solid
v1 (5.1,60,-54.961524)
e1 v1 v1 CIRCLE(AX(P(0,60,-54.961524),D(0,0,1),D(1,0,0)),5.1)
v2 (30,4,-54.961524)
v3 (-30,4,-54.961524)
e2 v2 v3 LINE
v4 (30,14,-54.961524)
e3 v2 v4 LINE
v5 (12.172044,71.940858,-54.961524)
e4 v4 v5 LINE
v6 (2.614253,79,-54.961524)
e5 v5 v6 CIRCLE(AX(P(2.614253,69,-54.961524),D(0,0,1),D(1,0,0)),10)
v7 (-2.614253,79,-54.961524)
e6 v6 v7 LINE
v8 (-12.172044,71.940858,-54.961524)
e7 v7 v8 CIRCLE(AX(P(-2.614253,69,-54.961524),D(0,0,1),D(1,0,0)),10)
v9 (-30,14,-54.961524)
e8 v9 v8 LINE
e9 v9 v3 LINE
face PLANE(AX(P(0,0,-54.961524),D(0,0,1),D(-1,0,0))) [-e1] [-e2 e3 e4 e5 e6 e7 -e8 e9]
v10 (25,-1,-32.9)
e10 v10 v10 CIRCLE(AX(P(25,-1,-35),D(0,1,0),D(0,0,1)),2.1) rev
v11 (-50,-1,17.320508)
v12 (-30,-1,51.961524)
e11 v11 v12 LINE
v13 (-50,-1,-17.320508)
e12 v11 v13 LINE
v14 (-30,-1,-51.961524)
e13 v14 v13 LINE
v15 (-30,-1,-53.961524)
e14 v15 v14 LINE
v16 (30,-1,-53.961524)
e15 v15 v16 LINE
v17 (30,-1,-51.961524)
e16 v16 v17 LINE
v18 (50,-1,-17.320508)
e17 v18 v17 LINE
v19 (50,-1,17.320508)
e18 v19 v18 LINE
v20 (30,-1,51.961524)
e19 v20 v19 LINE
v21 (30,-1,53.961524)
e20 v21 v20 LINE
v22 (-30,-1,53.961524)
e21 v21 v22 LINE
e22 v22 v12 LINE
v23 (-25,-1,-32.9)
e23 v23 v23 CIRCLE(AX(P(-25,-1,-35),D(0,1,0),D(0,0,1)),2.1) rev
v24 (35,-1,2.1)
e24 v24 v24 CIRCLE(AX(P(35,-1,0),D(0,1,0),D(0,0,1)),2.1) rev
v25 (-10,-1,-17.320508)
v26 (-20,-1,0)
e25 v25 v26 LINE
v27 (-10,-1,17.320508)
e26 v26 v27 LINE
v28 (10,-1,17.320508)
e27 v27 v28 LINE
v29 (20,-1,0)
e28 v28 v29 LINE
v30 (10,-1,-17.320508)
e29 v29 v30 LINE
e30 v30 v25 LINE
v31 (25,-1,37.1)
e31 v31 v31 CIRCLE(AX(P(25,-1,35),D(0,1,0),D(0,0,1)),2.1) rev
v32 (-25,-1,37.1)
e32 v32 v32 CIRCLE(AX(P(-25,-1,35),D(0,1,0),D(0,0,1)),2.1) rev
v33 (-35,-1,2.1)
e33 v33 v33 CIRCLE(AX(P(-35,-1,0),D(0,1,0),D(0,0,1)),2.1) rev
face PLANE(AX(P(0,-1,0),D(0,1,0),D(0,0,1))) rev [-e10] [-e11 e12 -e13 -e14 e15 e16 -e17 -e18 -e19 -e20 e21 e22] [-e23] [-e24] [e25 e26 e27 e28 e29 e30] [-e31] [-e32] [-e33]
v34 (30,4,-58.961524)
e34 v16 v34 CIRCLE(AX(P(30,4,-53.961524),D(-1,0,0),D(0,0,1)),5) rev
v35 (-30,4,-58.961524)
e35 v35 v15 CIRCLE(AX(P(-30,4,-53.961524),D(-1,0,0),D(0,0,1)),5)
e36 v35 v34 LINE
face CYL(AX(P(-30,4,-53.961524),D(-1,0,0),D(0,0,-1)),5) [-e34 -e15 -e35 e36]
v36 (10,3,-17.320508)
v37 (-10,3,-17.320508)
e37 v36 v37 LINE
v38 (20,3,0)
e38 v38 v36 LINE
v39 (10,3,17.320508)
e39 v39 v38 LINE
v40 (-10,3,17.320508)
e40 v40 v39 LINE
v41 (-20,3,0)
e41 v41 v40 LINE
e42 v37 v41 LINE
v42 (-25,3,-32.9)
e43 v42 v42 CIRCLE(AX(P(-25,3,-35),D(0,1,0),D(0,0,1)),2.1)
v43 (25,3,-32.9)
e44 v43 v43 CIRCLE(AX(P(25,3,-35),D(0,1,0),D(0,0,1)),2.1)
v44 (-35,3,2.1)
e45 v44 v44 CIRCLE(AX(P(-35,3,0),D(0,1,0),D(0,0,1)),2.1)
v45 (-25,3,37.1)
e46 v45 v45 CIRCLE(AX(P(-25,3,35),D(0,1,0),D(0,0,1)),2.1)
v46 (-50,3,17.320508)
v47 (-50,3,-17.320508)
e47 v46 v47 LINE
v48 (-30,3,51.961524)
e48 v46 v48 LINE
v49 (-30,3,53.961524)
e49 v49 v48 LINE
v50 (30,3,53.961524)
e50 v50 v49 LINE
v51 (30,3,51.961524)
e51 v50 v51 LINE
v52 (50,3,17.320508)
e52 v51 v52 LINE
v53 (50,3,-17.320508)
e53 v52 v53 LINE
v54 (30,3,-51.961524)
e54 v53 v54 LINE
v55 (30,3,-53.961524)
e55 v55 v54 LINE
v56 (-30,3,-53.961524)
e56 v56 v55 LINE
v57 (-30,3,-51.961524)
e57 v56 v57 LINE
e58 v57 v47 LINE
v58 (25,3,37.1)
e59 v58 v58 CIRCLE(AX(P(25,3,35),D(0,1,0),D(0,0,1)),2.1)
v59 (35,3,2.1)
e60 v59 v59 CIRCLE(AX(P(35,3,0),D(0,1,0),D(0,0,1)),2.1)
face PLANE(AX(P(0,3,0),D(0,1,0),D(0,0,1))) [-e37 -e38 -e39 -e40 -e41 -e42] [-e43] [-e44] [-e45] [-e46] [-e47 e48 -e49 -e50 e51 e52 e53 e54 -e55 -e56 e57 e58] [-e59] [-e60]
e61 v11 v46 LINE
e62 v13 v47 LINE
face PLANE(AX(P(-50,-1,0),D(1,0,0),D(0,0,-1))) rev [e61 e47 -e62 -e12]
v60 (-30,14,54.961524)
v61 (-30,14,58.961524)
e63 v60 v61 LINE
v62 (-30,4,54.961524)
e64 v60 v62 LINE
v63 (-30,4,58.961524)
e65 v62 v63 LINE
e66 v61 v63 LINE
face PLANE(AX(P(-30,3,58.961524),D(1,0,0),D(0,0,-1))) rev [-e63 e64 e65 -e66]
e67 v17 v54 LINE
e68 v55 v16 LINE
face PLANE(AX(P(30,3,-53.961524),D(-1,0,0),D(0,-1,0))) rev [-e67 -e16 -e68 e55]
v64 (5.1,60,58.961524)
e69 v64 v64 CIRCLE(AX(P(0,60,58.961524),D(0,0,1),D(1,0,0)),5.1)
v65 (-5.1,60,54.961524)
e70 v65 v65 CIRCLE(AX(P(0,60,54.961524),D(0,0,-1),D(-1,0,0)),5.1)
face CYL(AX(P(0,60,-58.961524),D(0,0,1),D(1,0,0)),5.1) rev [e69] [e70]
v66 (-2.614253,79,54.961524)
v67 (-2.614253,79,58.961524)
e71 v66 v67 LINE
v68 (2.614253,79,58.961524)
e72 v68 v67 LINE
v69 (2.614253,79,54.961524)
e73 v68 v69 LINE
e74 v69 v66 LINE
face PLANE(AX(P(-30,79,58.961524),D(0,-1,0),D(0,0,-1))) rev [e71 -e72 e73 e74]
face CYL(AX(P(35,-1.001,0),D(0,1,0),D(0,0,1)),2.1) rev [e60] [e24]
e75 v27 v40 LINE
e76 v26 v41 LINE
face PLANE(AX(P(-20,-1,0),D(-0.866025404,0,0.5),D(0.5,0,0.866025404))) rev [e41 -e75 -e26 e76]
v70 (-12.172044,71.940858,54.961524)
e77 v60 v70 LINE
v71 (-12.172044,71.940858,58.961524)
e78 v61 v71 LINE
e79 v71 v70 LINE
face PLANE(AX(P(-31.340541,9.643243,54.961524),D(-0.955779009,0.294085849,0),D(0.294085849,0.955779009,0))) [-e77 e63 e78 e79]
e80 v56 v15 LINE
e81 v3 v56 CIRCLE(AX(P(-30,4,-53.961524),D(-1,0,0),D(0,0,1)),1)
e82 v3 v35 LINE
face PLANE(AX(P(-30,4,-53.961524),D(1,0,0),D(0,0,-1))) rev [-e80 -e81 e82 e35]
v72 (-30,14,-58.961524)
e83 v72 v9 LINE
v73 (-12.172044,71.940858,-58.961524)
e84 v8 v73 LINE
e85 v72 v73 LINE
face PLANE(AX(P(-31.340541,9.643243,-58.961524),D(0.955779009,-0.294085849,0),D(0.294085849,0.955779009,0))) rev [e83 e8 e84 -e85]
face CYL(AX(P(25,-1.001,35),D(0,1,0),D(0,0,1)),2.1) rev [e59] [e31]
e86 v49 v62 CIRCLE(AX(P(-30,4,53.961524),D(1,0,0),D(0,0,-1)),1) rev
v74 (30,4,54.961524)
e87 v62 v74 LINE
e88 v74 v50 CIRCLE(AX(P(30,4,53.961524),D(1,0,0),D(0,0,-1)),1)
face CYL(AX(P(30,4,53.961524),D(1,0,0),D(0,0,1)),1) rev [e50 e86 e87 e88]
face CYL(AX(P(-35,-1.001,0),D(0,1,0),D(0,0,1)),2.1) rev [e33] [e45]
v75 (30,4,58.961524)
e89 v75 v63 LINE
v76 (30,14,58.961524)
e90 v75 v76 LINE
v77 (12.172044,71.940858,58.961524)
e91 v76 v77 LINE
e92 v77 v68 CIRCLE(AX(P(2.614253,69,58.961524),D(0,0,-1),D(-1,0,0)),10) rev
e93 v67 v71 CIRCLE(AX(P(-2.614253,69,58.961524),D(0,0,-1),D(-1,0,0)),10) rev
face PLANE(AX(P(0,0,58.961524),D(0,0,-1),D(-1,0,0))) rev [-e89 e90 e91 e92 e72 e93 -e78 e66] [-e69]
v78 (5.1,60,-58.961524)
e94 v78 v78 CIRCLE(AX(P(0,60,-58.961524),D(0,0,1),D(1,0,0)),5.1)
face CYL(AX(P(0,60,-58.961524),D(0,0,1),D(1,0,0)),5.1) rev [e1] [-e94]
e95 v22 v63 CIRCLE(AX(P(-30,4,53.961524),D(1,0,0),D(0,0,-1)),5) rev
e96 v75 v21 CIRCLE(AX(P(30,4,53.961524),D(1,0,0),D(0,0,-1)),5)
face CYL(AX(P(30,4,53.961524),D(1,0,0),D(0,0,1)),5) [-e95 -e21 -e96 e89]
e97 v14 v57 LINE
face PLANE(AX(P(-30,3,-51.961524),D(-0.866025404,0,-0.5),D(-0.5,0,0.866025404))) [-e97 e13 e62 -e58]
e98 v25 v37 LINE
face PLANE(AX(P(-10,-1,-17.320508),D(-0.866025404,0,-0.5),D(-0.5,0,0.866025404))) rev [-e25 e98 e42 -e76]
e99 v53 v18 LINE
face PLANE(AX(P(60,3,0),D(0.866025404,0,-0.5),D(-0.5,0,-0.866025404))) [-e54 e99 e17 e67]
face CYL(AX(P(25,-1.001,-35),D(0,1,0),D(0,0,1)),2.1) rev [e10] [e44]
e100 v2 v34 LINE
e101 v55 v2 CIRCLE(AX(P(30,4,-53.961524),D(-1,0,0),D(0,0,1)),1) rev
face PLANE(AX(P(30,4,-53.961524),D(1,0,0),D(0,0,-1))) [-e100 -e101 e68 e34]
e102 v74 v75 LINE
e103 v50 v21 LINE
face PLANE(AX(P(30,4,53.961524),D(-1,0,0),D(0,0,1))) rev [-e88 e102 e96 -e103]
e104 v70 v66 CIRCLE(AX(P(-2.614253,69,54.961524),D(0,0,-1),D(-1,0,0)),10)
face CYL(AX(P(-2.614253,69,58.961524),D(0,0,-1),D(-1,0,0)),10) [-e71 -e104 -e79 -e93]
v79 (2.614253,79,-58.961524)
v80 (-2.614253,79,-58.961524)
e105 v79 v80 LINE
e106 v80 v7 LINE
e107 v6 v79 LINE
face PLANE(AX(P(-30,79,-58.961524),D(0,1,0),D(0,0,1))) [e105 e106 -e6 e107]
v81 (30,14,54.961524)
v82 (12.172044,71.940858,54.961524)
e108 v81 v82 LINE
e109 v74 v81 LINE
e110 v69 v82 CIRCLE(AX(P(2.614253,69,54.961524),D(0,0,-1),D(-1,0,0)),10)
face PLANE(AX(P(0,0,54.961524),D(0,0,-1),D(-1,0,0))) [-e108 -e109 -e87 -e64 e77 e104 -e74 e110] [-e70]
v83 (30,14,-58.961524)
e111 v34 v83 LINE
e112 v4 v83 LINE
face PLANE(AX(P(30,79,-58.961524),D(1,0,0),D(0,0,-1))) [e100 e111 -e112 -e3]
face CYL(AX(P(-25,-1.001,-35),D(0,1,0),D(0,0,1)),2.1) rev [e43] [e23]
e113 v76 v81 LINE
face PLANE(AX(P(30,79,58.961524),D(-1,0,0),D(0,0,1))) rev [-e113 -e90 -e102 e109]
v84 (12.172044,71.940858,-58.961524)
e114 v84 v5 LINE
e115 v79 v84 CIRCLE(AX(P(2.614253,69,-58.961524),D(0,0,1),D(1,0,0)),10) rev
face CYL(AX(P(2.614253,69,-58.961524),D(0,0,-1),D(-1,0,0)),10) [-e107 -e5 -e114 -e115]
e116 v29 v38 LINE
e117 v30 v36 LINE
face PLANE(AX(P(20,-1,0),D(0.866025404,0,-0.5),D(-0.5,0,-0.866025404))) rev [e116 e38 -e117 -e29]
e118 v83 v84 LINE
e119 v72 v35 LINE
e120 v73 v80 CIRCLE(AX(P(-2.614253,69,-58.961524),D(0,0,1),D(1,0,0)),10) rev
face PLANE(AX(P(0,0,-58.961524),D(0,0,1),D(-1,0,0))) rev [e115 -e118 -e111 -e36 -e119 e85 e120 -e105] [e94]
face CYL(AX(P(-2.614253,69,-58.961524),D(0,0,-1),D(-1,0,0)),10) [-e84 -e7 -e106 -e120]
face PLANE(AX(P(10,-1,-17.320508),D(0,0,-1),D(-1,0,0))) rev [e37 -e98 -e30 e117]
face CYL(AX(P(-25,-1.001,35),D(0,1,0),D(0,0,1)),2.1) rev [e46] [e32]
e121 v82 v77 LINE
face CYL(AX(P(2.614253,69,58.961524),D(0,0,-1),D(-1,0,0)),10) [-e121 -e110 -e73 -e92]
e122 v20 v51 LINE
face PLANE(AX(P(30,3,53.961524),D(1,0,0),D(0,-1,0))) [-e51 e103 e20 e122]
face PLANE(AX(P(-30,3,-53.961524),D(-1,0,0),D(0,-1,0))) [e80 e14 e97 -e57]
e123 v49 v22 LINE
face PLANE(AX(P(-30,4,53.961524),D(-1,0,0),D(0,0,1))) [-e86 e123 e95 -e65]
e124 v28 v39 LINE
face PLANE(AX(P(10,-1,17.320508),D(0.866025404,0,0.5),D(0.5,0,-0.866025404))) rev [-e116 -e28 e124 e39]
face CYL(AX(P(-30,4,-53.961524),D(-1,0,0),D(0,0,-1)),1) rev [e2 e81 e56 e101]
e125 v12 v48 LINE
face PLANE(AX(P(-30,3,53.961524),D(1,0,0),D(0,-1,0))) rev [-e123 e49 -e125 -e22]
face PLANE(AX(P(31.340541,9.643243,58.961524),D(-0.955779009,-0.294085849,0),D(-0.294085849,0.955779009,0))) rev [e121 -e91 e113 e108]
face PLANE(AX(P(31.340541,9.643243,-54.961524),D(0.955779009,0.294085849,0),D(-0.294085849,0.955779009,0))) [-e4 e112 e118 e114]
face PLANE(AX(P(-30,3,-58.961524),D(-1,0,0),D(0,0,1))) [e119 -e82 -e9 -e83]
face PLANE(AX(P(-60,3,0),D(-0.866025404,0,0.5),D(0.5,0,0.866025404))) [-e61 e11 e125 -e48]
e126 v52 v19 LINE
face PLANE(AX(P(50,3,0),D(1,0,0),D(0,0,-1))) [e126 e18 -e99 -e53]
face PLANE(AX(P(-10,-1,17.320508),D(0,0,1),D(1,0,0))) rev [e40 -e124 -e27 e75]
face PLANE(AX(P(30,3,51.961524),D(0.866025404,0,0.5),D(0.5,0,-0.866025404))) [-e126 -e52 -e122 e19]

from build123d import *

# Parameters (mm, degrees)
EXTRUDE_1_DEPTH        = 3
SHEET_START            = -1
SHEET_METAL_1_DEPTH    = 1
SM_EDGE_FLANGE_1_DEPTH = 60
CUT_EXTRUDE_1_DEPTH    = 149.811702088
CUT_EXTRUDE_2_DEPTH    = 114.368696469
CUT_EXTRUDE_4_DEPTH    = 114.368696469
MIRROR_6_COPY_1_DEPTH  = 149.811702088
SKETCH_13_R            = 5.1
CUT_EXTRUDE_5_DEPTH    = 155.10011472
FILLET_1_R             = 10
CUT_EXTRUDE_6_REACH    = 110.409
SKETCH_15_R            = 2.1


# Read off the part's stored shape, not the designer's step: 轉換-實體1
# Sheet-metal steps are written as plain solids
with BuildPart() as part:
    # Sketch 1 → 填料-伸長1 (new body)
    with BuildSketch(Plane(origin=(0, 0, 0), x_dir=(1, 0, 0), z_dir=(0, 1, 0))):
        Polygon((30, 51.961524227), (-30, 51.961524227), (-60, 0), (-30, -51.961524227), (30, -51.961524227), (60, 0), align=None)
    extrude(amount=EXTRUDE_1_DEPTH)

    # Sheet Metal 1 outline → Sheet Metal 1 (add)
    with BuildSketch(Plane(origin=(0, 0, 0), x_dir=(1, 0, 0), z_dir=(0, 1, 0)).offset(SHEET_START)):
        Polygon((-30, 51.961524227), (-60, 0), (-30, -51.961524227), (30, -51.961524227), (60, 0), (30, 51.961524227), align=None)
    extrude(amount=SHEET_METAL_1_DEPTH)

    # 邊線-凸緣1 section (across the edge) → 邊線-凸緣1 (add)
    with BuildSketch(Plane(origin=(-30, 3, 54.961524227), x_dir=(0, 0, -1), z_dir=(1, 0, 0))):
        with BuildLine():
            Line((-4, 1), (-4, 76))
            Line((-4, 76), (0, 76))
            Line((0, 76), (0, 1))
            ThreePointArc((0, 1), (0.292893219, 0.292893219), (1, 0))
            Line((1, 0), (3, 0))
            Line((3, 0), (3, -4))
            Line((3, -4), (1, -4))
            ThreePointArc((1, -4), (-2.535533906, -2.535533906), (-4, 1))
        make_face()
    sm_edge_flange_1 = extrude(amount=SM_EDGE_FLANGE_1_DEPTH)

    # 草圖9 → 除料-伸長1 (cut, symmetric)
    with BuildSketch(Plane.XY.offset(58.961524227)):
        Polygon((-30, 79), (-30, 14), (-10, 79), align=None)
    cut_extrude_1 = extrude(amount=CUT_EXTRUDE_1_DEPTH, both=True, mode=Mode.SUBTRACT)

    # 草圖10 → 除料-伸長2 (cut, through all)
    with BuildSketch(Plane(origin=(0, 3, 0), x_dir=(1, 0, 0), z_dir=(0, 1, 0))):
        Polygon((10, 17.320508076), (-10, 17.320508076), (-20, 0), (-10, -17.320508076), (10, -17.320508076), (20, 0), align=None)
    extrude(amount=-CUT_EXTRUDE_2_DEPTH, mode=Mode.SUBTRACT)

    # 草圖12 → 除料-伸長4 (cut, symmetric)
    with BuildSketch(Plane(origin=(0, 3, 0), x_dir=(1, 0, 0), z_dir=(0, 1, 0))):
        Polygon((50, 295.043861202), (50, 17.320508076), (50, -17.320508076), (50, -295.043861202), (605.446706252, -295.043861202), (605.446706252, 295.043861202), align=None)
    cut_extrude_4 = extrude(amount=CUT_EXTRUDE_4_DEPTH, both=True, mode=Mode.SUBTRACT)

    # 鏡射1: 除料-伸長1 across plane
    add(cut_extrude_1.mirror(Plane(origin=(0, 0, 0), x_dir=(0, 0, 1), z_dir=(1, 0, 0))), mode=Mode.SUBTRACT)

    # 鏡射6: 邊線-凸緣1, 除料-伸長1 across plane
    add(sm_edge_flange_1.mirror(Plane.XY))
    add(cut_extrude_1.mirror(Plane.XY), mode=Mode.SUBTRACT)

    # 鏡射6 copy 1 sketch → 鏡射6 copy 1 (cut, symmetric)
    with BuildSketch(Plane(origin=(0, 0, -58.961524227), x_dir=(-1, 0, 0), z_dir=(0, 0, -1))):
        Polygon((-30, 79), (-30, 14), (-10, 79), align=None)
    extrude(amount=MIRROR_6_COPY_1_DEPTH, both=True, mode=Mode.SUBTRACT)

    # 草圖13 → 除料-伸長5 (cut, through all)
    with BuildSketch(Plane.XY.offset(58.961524227)):
        with Locations((0, 60)):
            Circle(SKETCH_13_R)
    extrude(amount=-CUT_EXTRUDE_5_DEPTH, mode=Mode.SUBTRACT)

    # 圓角1
    fillet_1_edges = [part.edges().sort_by_distance(p)[0] for p in [
        (10, 79, 56.961524227),
        (10, 79, -56.961524227),
        (-10, 79, -56.961524227),
        (-10, 79, 56.961524227),
    ]]
    fillet(fillet_1_edges, radius=FILLET_1_R)

    # 鏡射7: 除料-伸長4 across plane
    add(cut_extrude_4.mirror(Plane(origin=(0, 0, 0), x_dir=(0, 0, 1), z_dir=(1, 0, 0))), mode=Mode.SUBTRACT)

    # 草圖15 → 除料-伸長6 (cut, up to next)
    with BuildSketch(Plane(origin=(0, 3, 0), x_dir=(1, 0, 0), z_dir=(0, 1, 0)), mode=Mode.PRIVATE) as cut_extrude_6_sk1:
        with Locations(Location((-35, 0, 0), (0, 0, 270))):
            Circle(SKETCH_15_R)
    cut_extrude_6_tool1 = extrude(cut_extrude_6_sk1.sketch, amount=-CUT_EXTRUDE_6_REACH, mode=Mode.PRIVATE) & part.part
    # 草圖15 → 除料-伸長6 (cut, up to next)
    with BuildSketch(Plane(origin=(0, 3, 0), x_dir=(1, 0, 0), z_dir=(0, 1, 0)), mode=Mode.PRIVATE) as cut_extrude_6_sk2:
        with Locations(Location((-25, 35, 0), (0, 0, 270))):
            Circle(SKETCH_15_R)
    cut_extrude_6_tool2 = extrude(cut_extrude_6_sk2.sketch, amount=-CUT_EXTRUDE_6_REACH, mode=Mode.PRIVATE) & part.part
    # 草圖15 → 除料-伸長6 (cut, up to next)
    with BuildSketch(Plane(origin=(0, 3, 0), x_dir=(1, 0, 0), z_dir=(0, 1, 0)), mode=Mode.PRIVATE) as cut_extrude_6_sk3:
        with Locations(Location((25, 35, 0), (0, 0, 270))):
            Circle(SKETCH_15_R)
    cut_extrude_6_tool3 = extrude(cut_extrude_6_sk3.sketch, amount=-CUT_EXTRUDE_6_REACH, mode=Mode.PRIVATE) & part.part
    # 草圖15 → 除料-伸長6 (cut, up to next)
    with BuildSketch(Plane(origin=(0, 3, 0), x_dir=(1, 0, 0), z_dir=(0, 1, 0)), mode=Mode.PRIVATE) as cut_extrude_6_sk4:
        with Locations(Location((25, -35, 0), (0, 0, 270))):
            Circle(SKETCH_15_R)
    cut_extrude_6_tool4 = extrude(cut_extrude_6_sk4.sketch, amount=-CUT_EXTRUDE_6_REACH, mode=Mode.PRIVATE) & part.part
    # 草圖15 → 除料-伸長6 (cut, up to next)
    with BuildSketch(Plane(origin=(0, 3, 0), x_dir=(1, 0, 0), z_dir=(0, 1, 0)), mode=Mode.PRIVATE) as cut_extrude_6_sk5:
        with Locations(Location((-25, -35, 0), (0, 0, 270))):
            Circle(SKETCH_15_R)
    cut_extrude_6_tool5 = extrude(cut_extrude_6_sk5.sketch, amount=-CUT_EXTRUDE_6_REACH, mode=Mode.PRIVATE) & part.part
    # 草圖15 → 除料-伸長6 (cut, up to next)
    with BuildSketch(Plane(origin=(0, 3, 0), x_dir=(1, 0, 0), z_dir=(0, 1, 0)), mode=Mode.PRIVATE) as cut_extrude_6_sk6:
        with Locations(Location((35, 0, 0), (0, 0, 270))):
            Circle(SKETCH_15_R)
    cut_extrude_6_tool6 = extrude(cut_extrude_6_sk6.sketch, amount=-CUT_EXTRUDE_6_REACH, mode=Mode.PRIVATE) & part.part
    add(cut_extrude_6_tool1.solids().sort_by_distance((-35, 3, 0))[0], mode=Mode.SUBTRACT)
    add(cut_extrude_6_tool2.solids().sort_by_distance((-25, 3, -35))[0], mode=Mode.SUBTRACT)
    add(cut_extrude_6_tool3.solids().sort_by_distance((25, 3, -35))[0], mode=Mode.SUBTRACT)
    add(cut_extrude_6_tool4.solids().sort_by_distance((25, 3, 35))[0], mode=Mode.SUBTRACT)
    add(cut_extrude_6_tool5.solids().sort_by_distance((-25, 3, 35))[0], mode=Mode.SUBTRACT)
    add(cut_extrude_6_tool6.solids().sort_by_distance((35, 3, 0))[0], mode=Mode.SUBTRACT)


solid = part.part
